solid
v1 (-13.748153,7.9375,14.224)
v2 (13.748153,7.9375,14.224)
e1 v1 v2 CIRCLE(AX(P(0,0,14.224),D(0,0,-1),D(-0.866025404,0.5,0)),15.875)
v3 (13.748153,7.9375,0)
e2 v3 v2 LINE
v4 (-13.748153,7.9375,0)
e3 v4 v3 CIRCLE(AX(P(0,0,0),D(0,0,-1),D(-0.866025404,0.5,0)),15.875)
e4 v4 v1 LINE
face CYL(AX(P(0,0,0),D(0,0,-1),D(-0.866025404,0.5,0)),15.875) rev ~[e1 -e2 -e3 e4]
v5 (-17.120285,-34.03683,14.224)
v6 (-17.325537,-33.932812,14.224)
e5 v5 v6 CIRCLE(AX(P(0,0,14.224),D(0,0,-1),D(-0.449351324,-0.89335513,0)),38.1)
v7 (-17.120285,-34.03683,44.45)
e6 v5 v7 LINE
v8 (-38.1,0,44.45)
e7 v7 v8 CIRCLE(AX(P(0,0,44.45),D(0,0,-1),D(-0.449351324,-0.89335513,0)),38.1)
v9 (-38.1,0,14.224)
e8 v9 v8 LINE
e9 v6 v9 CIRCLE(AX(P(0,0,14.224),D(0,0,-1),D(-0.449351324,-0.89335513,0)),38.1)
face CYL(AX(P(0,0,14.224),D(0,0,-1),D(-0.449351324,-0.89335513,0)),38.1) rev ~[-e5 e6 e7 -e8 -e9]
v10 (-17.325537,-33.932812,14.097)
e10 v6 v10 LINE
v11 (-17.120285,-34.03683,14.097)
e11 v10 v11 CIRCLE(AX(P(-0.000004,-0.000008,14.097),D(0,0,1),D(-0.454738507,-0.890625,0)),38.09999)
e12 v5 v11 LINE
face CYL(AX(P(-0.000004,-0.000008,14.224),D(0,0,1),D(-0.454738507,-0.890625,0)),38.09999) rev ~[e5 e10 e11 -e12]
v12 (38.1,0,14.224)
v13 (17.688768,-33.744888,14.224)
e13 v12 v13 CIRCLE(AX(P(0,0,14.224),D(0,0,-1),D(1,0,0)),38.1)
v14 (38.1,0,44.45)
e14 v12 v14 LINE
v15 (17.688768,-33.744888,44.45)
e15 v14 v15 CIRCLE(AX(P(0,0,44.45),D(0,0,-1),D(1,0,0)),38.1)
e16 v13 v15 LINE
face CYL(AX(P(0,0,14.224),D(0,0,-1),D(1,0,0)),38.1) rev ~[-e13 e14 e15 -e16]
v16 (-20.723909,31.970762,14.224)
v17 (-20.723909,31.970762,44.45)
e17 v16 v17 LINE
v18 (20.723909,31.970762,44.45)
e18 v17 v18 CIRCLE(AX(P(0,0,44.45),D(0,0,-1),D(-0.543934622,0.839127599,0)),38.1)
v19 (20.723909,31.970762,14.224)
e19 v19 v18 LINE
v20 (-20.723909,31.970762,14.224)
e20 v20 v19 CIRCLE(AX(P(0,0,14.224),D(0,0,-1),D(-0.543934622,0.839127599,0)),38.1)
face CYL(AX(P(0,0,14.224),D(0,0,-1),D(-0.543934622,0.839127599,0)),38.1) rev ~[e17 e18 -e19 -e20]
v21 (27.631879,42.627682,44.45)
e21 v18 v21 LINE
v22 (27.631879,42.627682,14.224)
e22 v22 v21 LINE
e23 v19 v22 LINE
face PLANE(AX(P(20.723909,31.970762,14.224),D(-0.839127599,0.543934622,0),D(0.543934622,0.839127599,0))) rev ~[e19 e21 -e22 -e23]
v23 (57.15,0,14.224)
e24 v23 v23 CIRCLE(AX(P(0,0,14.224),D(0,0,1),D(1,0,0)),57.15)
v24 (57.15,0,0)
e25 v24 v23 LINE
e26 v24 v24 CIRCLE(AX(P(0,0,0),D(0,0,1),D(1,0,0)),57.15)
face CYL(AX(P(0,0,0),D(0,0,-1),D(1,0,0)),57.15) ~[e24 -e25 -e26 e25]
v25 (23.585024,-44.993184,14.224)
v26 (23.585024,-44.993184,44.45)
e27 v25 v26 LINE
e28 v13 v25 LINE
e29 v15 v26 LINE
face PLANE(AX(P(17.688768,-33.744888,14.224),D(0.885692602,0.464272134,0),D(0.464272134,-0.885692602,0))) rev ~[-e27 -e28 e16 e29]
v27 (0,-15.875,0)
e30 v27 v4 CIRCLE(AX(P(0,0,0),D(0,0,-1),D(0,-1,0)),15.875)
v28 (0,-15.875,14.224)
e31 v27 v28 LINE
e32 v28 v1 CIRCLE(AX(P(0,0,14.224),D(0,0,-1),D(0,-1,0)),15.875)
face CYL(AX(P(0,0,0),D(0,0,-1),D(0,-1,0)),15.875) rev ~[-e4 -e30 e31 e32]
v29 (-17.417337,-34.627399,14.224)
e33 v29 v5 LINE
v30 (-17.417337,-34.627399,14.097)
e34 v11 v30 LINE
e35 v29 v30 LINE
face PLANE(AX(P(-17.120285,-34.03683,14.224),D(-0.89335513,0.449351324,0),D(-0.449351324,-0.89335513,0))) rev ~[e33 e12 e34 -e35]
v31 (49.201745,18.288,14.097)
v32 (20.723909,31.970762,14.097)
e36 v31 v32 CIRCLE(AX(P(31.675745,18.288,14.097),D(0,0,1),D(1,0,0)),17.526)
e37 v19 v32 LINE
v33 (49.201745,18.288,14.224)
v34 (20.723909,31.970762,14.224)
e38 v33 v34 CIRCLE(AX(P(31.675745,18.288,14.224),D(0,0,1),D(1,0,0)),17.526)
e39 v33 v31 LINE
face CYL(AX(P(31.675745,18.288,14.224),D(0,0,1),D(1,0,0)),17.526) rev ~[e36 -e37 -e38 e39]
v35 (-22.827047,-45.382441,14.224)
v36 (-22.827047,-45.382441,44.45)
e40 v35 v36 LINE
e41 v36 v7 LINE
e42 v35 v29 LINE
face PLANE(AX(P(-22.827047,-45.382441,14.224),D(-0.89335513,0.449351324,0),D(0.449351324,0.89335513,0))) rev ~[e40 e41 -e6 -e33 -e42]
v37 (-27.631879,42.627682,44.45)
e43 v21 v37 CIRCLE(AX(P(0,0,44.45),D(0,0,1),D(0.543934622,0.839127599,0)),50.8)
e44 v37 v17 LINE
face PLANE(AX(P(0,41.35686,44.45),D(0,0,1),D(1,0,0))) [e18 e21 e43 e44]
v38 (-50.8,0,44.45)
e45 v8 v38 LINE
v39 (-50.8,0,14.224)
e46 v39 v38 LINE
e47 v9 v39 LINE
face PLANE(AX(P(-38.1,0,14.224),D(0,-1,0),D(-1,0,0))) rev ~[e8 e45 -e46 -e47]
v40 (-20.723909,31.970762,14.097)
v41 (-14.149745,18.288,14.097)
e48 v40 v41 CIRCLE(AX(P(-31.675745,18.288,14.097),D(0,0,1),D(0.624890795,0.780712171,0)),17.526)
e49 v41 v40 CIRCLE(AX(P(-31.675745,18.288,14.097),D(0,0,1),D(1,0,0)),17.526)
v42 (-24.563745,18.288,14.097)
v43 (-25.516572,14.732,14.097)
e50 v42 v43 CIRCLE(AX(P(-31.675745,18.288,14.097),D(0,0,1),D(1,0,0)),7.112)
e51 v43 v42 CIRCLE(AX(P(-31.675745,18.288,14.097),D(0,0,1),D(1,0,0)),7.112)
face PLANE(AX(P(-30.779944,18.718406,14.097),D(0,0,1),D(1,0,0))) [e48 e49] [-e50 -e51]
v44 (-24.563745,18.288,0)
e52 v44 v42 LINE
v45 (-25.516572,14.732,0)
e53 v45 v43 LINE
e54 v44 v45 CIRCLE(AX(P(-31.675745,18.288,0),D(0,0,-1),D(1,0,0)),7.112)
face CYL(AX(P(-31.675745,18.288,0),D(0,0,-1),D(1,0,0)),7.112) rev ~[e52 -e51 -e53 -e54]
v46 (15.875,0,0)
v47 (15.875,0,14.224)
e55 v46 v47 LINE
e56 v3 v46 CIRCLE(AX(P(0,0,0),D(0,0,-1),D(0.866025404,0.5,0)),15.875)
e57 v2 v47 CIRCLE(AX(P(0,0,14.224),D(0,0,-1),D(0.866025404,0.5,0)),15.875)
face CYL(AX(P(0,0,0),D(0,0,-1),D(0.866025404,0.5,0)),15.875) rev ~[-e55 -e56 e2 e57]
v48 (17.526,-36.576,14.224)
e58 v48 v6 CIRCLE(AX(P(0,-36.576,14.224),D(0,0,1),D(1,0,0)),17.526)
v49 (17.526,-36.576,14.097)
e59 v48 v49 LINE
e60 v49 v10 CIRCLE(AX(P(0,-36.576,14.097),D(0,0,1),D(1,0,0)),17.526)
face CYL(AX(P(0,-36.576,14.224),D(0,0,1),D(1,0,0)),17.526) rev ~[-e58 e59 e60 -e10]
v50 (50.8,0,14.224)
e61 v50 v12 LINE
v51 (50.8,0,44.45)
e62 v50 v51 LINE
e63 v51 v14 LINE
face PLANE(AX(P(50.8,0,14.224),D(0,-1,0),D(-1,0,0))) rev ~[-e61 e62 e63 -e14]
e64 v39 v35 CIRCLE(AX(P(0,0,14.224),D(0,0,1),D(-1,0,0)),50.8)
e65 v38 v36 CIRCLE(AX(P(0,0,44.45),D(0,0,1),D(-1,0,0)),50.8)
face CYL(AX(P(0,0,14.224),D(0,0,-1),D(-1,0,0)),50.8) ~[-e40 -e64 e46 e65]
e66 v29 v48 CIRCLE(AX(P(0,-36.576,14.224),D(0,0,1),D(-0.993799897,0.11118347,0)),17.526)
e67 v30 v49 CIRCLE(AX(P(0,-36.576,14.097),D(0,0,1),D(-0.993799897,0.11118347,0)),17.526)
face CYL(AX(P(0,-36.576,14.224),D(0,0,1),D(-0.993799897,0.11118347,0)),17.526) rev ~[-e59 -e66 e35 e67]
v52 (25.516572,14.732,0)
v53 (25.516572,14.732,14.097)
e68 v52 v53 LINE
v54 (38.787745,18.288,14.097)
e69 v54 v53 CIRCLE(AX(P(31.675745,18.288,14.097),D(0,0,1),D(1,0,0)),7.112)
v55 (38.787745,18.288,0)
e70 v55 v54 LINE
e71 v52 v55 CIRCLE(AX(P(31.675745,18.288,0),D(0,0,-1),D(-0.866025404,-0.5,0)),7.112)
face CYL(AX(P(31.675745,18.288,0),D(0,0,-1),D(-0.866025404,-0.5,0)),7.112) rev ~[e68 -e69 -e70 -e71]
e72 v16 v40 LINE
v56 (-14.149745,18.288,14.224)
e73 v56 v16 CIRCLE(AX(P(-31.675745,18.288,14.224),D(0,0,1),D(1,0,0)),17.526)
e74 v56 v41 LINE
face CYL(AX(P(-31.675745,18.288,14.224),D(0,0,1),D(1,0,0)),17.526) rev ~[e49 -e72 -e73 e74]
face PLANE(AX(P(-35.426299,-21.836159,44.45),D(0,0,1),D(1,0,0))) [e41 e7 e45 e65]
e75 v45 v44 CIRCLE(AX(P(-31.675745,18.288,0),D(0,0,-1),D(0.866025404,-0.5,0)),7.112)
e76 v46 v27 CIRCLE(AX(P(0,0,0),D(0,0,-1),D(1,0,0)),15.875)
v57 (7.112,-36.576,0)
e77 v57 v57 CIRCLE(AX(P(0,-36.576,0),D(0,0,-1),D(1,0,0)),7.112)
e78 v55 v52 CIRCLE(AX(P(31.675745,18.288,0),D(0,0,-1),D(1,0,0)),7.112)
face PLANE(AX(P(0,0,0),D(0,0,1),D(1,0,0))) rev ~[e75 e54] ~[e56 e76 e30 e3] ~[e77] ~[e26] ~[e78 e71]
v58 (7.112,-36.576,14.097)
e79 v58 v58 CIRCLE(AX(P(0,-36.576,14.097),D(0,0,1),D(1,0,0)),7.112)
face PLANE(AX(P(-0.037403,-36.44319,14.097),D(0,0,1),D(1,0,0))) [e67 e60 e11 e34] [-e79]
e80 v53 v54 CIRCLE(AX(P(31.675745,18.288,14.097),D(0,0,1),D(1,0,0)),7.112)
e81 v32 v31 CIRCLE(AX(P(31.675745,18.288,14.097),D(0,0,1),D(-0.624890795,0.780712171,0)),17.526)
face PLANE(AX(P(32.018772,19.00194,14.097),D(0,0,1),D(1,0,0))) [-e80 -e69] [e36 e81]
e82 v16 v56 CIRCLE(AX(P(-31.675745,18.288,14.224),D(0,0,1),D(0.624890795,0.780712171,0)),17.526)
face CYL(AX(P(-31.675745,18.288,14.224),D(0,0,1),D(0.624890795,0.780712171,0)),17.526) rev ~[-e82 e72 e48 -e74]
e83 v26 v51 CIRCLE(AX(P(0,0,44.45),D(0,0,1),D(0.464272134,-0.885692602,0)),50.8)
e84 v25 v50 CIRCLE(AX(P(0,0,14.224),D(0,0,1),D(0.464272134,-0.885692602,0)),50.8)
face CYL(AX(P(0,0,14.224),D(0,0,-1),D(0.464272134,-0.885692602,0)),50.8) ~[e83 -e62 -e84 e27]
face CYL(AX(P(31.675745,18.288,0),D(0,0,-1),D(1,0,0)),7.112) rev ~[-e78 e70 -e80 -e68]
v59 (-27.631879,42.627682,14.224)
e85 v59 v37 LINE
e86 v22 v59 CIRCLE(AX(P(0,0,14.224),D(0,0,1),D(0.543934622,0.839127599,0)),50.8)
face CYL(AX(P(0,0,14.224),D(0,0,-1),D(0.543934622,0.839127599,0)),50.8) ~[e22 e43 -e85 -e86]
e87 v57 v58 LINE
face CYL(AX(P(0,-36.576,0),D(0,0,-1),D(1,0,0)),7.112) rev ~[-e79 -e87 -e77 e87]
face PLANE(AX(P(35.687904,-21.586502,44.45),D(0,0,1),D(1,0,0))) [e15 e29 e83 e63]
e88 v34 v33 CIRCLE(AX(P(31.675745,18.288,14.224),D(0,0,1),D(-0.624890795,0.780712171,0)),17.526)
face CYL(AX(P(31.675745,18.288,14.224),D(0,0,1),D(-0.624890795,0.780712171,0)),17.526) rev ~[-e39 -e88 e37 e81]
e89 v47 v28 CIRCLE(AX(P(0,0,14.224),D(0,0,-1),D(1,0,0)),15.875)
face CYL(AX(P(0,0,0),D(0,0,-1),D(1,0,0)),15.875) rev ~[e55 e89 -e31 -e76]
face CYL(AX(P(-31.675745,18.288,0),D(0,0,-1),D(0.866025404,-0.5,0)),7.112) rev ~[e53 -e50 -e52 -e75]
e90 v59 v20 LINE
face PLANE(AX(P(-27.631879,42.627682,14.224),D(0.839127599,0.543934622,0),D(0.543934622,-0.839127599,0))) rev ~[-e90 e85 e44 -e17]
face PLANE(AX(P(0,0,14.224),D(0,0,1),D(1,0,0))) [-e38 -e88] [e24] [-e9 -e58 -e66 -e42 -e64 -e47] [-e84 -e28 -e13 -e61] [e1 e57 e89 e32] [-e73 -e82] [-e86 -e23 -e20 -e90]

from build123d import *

# Parameters (mm, degrees)
F0_R     = 57.15
F1_DEPTH = 14.224
F3_DEPTH = 30.226
F4_R     = 7.112
F5_DEPTH = 0.127


with BuildPart() as f1:
    # F0 (on Top) → F1 (new body)
    with BuildSketch(Plane.XY):
        Circle(F0_R)
        with BuildLine():
            ThreePointArc((0, -29.464), (5.0289434278, -31.5470565722), (7.112, -36.576))
            ThreePointArc((7.112, -36.576), (-5.0289434278, -41.6049434278), (0, -29.464))
        make_face(mode=Mode.SUBTRACT)
        with BuildLine():
            ThreePointArc((-24.5637451688, 18.288), (-24.8060806923, 16.4472789512), (-25.5165724971, 14.732))
            ThreePointArc((-25.5165724971, 14.732), (-38.5454096454, 20.1287210488), (-24.5637451688, 18.288))
        make_face(mode=Mode.SUBTRACT)
        with BuildLine():
            ThreePointArc((15.875, 0), (11.2253201513, -11.2253201513), (0, -15.875))
            ThreePointArc((0, -15.875), (-13.7481532851, -7.9375), (-13.7481532851, 7.9375))
            ThreePointArc((-13.7481532851, 7.9375), (0, 15.875), (13.7481532851, 7.9375))
            ThreePointArc((13.7481532851, 7.9375), (15.3340724923, 4.108752341), (15.875, 0))
        make_face(mode=Mode.SUBTRACT)
        with BuildLine():
            ThreePointArc((38.7877451688, 18.288), (33.5164662176, 11.4183355234), (25.5165724971, 14.732))
            ThreePointArc((25.5165724971, 14.732), (29.8350241201, 25.1576644766), (38.7877451688, 18.288))
        make_face(mode=Mode.SUBTRACT)
    extrude(amount=F1_DEPTH)

    # F2 (on face) → F3 (join)
    with BuildSketch(Plane.XY.offset(14.224)):
        with BuildLine():
            ThreePointArc((-17.1202854359, -34.0368304428), (-32.4337237695, -19.9915872918), (-38.1, 0))
            Line((-38.1, 0), (-50.8, 0))
            ThreePointArc((-50.8, 0), (-43.244965026, -26.6554497224), (-22.8270472479, -45.3824405904))
            Line((-22.8270472479, -45.3824405904), (-17.1202854359, -34.0368304428))
        make_face()
        with BuildLine():
            ThreePointArc((-20.7239090963, 31.9707615137), (0, 38.1), (20.7239090963, 31.9707615137))
            Line((20.7239090963, 31.9707615137), (27.6318787951, 42.6276820183))
            ThreePointArc((27.6318787951, 42.6276820183), (0, 50.8), (-27.6318787951, 42.6276820183))
            Line((-27.6318787951, 42.6276820183), (-20.7239090963, 31.9707615137))
        make_face()
        with BuildLine():
            ThreePointArc((38.1, 0), (32.6002459501, -19.7188732942), (17.6887682944, -33.7448881496))
            Line((17.6887682944, -33.7448881496), (23.5850243925, -44.9931841994))
            ThreePointArc((23.5850243925, -44.9931841994), (43.4669946002, -26.2918310589), (50.8, 0))
            Line((50.8, 0), (38.1, 0))
        make_face()
    extrude(amount=F3_DEPTH)

    # F4 (on face) → F5 (cut)
    with BuildSketch(Plane.XY.offset(14.224)):
        with BuildLine():
            ThreePointArc((-20.7239090963, 31.9707615137), (-47.4729372454, 10.6979144605), (-14.1497451688, 18.288))
            ThreePointArc((-14.1497451688, 18.288), (-15.8785530923, 25.8780855395), (-20.7239090963, 31.9707615137))
        make_face()
        with Locations((-31.6757451688, 18.288)):
            Circle(F4_R, mode=Mode.SUBTRACT)
        with BuildLine():
            ThreePointArc((49.2017451688, 18.288), (39.2658307083, 34.0851920765), (20.7239090963, 31.9707615137))
            ThreePointArc((20.7239090963, 31.9707615137), (24.0856596293, 2.4908079235), (49.2017451688, 18.288))
        make_face()
        with Locations((31.6757451688, 18.288)):
            Circle(F4_R, mode=Mode.SUBTRACT)
        with BuildLine():
            ThreePointArc((-17.4173370009, -34.6273985025), (-0.9758144603, -54.0748131637), (17.526, -36.576))
            ThreePointArc((17.526, -36.576), (1.3253891442, -19.1001875835), (-17.325537101, -33.9328125))
            ThreePointArc((-17.325537101, -33.9328125), (-17.2229897955, -33.9849764235), (-17.1202854359, -34.0368304428))
            Line((-17.1202854359, -34.0368304428), (-17.4173370009, -34.6273985025))
        make_face()
        with Locations((0, -36.576)):
            Circle(F4_R, mode=Mode.SUBTRACT)
    extrude(amount=-F5_DEPTH, mode=Mode.SUBTRACT)


solid = f1.part
